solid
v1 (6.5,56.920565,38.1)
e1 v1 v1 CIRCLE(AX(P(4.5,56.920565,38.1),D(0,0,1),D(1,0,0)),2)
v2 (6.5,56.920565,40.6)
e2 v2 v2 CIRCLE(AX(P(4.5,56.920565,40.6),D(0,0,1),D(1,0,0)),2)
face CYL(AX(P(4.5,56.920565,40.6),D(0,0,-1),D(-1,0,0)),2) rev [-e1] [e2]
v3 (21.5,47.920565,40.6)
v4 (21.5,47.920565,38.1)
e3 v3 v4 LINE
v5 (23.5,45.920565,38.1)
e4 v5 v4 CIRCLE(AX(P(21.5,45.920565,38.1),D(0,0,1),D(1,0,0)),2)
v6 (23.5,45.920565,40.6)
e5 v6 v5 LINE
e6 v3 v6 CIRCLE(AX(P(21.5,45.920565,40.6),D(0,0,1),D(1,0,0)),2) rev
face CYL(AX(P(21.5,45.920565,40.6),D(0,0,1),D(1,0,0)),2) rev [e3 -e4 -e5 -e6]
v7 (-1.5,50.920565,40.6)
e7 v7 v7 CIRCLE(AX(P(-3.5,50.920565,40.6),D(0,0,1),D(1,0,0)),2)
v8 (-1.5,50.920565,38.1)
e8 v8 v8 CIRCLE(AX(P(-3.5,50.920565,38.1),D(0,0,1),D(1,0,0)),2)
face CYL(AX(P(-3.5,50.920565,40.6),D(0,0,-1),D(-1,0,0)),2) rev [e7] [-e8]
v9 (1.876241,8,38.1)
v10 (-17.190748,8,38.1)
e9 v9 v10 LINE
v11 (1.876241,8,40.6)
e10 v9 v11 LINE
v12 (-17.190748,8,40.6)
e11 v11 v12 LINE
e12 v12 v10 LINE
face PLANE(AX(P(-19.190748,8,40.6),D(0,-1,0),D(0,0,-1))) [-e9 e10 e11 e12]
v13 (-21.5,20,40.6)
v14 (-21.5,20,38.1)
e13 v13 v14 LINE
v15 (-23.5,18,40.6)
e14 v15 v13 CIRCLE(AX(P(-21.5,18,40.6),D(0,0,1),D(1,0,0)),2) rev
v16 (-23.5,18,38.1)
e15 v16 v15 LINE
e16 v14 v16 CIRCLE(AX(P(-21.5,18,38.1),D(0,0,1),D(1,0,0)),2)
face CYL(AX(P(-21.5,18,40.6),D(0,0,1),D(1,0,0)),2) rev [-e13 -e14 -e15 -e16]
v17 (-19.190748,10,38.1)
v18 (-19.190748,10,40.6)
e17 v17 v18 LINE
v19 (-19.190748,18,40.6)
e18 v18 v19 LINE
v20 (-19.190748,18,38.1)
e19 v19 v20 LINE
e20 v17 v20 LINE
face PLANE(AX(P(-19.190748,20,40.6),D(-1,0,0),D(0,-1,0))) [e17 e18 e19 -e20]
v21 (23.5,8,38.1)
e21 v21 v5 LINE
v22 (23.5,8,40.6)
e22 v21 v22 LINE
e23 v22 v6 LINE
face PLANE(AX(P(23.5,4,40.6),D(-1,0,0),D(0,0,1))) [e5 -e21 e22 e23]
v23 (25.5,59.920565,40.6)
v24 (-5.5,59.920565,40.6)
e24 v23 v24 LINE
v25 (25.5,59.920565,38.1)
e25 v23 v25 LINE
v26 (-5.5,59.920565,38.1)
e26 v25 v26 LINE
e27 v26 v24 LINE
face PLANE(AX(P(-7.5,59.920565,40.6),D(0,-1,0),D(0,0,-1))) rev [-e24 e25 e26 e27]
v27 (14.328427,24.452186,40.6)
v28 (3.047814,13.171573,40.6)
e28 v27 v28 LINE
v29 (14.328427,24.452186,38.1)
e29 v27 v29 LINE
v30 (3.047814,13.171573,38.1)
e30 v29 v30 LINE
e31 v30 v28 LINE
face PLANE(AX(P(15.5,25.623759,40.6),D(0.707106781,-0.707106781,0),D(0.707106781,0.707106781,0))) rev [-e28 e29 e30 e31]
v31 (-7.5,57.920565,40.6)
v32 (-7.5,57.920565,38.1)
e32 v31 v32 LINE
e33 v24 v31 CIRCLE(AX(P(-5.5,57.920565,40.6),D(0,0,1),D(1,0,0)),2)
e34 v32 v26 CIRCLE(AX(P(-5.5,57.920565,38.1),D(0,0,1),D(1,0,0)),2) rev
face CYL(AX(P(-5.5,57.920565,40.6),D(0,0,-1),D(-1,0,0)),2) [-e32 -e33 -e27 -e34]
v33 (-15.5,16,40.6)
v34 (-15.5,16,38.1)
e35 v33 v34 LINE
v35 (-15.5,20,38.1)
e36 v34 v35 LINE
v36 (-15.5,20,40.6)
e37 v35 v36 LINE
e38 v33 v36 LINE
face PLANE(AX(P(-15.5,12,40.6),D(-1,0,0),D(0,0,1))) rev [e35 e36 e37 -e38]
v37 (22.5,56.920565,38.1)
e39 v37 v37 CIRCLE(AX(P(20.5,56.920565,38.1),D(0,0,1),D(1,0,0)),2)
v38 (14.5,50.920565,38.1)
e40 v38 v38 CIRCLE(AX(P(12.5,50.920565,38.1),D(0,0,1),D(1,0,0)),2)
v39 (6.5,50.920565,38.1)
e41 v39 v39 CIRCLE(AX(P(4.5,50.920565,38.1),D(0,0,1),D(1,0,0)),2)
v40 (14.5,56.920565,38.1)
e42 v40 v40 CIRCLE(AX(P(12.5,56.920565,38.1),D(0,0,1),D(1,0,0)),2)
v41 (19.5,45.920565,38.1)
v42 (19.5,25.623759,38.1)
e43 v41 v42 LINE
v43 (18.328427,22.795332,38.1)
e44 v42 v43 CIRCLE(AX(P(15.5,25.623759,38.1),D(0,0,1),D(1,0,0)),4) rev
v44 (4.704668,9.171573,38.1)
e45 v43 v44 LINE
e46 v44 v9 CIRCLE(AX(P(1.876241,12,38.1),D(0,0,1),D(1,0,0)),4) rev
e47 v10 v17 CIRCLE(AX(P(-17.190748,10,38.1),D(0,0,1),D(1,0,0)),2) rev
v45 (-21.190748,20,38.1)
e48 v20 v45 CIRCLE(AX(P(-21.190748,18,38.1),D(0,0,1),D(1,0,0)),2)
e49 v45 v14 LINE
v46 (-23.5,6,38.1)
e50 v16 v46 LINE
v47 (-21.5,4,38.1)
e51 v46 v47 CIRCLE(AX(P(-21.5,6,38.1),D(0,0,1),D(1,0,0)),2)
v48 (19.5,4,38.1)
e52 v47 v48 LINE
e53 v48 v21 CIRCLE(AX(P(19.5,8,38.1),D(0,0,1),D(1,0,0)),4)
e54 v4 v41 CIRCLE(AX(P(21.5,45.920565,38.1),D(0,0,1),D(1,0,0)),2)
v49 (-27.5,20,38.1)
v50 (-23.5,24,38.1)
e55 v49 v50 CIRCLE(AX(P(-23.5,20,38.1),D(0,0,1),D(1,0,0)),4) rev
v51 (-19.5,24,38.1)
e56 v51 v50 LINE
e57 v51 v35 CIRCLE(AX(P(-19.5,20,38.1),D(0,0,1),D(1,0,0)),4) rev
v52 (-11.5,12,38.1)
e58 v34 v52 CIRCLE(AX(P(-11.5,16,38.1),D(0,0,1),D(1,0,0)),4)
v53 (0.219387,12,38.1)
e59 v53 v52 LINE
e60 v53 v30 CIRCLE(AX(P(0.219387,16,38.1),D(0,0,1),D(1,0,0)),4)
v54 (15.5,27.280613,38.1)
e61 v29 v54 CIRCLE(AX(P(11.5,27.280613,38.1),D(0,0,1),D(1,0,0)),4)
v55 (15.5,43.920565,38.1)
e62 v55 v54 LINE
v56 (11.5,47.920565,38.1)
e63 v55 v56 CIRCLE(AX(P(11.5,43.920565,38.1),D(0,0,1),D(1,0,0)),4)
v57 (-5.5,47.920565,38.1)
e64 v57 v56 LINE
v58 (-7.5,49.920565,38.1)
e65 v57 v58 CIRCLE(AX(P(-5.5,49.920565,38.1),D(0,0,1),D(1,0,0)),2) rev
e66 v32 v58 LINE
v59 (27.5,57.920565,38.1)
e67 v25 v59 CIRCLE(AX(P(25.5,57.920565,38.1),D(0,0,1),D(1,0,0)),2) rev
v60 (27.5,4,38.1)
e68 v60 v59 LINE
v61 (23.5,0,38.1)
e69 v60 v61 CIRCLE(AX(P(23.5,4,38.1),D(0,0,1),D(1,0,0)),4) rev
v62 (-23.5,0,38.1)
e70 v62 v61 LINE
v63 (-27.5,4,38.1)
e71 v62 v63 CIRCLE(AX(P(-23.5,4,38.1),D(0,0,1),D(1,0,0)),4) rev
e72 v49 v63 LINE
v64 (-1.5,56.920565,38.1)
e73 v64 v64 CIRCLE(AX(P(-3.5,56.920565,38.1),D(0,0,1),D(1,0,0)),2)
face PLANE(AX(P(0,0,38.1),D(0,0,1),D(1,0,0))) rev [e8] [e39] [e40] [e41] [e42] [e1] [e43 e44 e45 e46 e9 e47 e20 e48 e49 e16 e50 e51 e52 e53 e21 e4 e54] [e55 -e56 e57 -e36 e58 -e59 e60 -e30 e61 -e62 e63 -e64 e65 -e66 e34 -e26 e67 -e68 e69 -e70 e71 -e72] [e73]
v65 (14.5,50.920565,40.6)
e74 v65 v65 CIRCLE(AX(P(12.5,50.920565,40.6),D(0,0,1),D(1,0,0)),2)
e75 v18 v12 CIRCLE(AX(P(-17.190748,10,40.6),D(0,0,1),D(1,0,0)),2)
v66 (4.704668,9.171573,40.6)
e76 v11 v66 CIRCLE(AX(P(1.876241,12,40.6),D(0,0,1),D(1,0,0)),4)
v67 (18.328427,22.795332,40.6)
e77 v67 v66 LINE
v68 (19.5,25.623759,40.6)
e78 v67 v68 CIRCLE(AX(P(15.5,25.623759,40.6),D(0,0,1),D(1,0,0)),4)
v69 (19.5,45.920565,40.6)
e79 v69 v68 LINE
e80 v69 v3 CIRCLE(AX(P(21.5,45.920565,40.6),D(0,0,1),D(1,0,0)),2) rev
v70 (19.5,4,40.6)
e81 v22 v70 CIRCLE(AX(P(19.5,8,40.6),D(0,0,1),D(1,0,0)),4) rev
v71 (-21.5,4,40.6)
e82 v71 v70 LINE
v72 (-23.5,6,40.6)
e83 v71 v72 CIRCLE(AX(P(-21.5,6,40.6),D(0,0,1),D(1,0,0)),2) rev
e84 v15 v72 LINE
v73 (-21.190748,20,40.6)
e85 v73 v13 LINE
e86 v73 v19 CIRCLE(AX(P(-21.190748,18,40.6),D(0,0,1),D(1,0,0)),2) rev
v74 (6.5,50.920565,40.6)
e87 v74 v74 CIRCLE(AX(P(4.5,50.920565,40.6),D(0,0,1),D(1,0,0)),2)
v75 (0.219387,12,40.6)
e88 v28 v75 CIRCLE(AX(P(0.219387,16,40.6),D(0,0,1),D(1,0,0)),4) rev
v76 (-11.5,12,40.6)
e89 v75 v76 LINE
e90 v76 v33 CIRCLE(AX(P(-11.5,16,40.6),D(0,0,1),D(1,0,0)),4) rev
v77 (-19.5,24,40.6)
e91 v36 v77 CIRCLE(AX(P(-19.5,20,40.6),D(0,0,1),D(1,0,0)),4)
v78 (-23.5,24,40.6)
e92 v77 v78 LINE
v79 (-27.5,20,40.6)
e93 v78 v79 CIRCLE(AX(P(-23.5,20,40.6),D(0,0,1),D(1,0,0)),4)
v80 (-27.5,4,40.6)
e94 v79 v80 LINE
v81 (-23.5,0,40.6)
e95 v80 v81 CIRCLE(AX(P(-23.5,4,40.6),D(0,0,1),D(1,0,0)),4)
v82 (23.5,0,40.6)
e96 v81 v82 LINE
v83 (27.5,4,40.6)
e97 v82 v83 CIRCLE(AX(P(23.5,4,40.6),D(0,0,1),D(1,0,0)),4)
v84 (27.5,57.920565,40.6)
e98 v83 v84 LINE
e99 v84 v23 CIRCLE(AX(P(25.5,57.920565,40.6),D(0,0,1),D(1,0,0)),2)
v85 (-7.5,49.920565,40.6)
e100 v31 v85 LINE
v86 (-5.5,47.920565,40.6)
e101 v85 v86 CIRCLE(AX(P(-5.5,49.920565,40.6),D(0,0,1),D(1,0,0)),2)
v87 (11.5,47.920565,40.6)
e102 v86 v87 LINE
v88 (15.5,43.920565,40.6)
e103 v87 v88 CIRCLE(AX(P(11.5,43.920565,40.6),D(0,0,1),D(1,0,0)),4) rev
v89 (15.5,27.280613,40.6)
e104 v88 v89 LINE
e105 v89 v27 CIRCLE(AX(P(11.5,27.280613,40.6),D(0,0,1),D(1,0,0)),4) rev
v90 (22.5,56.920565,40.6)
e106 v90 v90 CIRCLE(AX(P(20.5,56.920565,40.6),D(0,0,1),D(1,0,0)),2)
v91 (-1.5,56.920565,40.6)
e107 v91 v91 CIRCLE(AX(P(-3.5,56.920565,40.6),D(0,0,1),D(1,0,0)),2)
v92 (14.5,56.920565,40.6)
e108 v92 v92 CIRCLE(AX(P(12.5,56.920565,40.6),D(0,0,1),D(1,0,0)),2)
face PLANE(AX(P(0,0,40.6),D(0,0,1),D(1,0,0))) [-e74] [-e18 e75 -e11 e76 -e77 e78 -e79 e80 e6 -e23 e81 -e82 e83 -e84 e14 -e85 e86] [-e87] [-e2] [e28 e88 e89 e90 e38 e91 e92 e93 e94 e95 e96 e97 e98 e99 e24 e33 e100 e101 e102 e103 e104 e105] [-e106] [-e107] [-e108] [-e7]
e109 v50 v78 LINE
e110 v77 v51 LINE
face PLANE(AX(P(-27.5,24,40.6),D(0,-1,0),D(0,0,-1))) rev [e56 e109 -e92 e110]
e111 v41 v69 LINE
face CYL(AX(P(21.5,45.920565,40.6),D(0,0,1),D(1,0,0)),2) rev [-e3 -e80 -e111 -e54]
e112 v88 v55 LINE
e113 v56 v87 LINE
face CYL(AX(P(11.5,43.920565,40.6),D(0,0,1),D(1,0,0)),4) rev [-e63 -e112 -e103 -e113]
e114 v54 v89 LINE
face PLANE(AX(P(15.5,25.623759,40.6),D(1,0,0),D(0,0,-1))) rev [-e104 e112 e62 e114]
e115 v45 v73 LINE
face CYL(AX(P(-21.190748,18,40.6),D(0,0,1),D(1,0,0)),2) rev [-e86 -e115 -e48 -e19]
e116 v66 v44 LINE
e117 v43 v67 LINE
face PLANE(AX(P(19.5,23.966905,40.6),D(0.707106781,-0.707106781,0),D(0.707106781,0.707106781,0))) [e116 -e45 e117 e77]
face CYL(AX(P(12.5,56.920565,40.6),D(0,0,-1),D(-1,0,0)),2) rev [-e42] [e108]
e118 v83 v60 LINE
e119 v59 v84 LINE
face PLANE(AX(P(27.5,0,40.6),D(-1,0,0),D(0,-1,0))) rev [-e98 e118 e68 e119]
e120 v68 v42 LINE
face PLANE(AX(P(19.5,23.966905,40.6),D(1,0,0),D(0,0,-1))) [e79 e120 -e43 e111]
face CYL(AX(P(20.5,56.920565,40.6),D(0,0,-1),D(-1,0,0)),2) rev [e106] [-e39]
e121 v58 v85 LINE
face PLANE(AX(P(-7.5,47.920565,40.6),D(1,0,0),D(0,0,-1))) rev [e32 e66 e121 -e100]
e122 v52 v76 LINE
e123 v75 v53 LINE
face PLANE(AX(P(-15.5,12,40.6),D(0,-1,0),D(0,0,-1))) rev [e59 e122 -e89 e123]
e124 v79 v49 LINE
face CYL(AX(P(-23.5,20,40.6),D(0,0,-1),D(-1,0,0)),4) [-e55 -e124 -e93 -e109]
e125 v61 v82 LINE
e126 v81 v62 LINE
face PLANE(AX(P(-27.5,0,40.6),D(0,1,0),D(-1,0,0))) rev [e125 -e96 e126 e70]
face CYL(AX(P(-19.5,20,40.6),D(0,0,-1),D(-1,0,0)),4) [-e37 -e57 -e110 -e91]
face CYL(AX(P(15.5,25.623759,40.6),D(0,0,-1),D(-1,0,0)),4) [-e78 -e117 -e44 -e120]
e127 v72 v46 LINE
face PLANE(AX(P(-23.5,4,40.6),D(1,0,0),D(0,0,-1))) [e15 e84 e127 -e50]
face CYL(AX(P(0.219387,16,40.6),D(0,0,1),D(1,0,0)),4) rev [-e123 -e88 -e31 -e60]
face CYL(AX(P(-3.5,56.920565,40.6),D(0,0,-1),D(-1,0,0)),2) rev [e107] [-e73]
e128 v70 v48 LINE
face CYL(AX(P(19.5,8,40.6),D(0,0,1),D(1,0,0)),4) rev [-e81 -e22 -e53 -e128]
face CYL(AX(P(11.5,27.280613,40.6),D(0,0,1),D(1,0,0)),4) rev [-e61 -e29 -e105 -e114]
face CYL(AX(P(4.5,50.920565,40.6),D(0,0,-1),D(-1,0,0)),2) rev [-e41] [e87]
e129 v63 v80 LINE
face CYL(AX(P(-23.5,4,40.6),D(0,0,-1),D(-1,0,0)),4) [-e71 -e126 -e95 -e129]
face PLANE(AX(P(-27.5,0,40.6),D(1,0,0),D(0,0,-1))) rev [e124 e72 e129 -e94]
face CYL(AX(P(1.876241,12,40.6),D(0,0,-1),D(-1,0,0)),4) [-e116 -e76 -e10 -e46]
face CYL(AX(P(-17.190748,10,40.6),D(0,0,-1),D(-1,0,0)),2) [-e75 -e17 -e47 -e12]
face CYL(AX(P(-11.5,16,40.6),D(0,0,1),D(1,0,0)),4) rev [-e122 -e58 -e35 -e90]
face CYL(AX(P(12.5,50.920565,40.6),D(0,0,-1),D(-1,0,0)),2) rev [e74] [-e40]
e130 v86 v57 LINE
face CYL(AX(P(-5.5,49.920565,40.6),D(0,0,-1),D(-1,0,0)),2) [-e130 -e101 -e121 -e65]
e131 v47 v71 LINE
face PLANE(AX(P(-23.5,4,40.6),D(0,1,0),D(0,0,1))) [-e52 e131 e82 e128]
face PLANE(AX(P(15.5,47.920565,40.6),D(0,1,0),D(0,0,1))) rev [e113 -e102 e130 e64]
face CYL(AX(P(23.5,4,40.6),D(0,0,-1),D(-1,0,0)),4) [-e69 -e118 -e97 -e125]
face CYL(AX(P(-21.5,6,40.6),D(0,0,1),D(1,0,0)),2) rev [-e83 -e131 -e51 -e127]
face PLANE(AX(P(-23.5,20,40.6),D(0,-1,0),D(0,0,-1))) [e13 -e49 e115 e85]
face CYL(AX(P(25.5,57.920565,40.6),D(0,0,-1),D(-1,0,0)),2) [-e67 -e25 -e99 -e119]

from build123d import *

# Parameters (mm, degrees)
SKETCH2_R           = 2
BOSS_EXTRUDE1_DEPTH = 2.5
FILLET1_R           = 4
FILLET2_R           = 2


with BuildPart() as part:
    # Sketch2 → Boss-Extrude1 (new body)
    with BuildSketch(Plane.XY.offset(38.1)):
        Polygon((-27.5, 0), (27.5, 0), (27.5, 59.920564885), (-7.5, 59.920564885), (-7.5, 47.920564885), (15.5, 47.920564885), (15.5, 25.623759218), (1.876240782, 12), (-15.5, 12), (-15.5, 24), (-27.5, 24), (-27.5, 12), align=None)
        with Locations((-3.5, 56.920564885)):
            Circle(SKETCH2_R, mode=Mode.SUBTRACT)
        with Locations((-3.5, 50.920564885)):
            Circle(SKETCH2_R, mode=Mode.SUBTRACT)
        with Locations((4.5, 50.920564885)):
            Circle(SKETCH2_R, mode=Mode.SUBTRACT)
        with Locations((12.5, 50.920564885)):
            Circle(SKETCH2_R, mode=Mode.SUBTRACT)
        with Locations((4.5, 56.920564885)):
            Circle(SKETCH2_R, mode=Mode.SUBTRACT)
        with Locations((12.5, 56.920564885)):
            Circle(SKETCH2_R, mode=Mode.SUBTRACT)
        with Locations((20.5, 56.920564885)):
            Circle(SKETCH2_R, mode=Mode.SUBTRACT)
        Polygon((23.5, 4), (23.5, 47.920564885), (19.5, 47.920564885), (19.5, 23.966904969), (3.533095031, 8), (-19.190748402, 8), (-19.190748402, 20), (-23.5, 20), (-23.5, 8), (-23.5, 4), align=None, mode=Mode.SUBTRACT)
    extrude(amount=BOSS_EXTRUDE1_DEPTH)

    # Fillet1
    fillet1_edges = [part.edges().sort_by_distance(p)[0] for p in [
        (15.5, 25.623759218, 39.35),
        (15.5, 47.920564885, 39.35),
        (27.5, 0, 39.35),
        (-27.5, 0, 39.35),
        (-27.5, 24, 39.35),
        (-15.5, 24, 39.35),
        (-15.5, 12, 39.35),
        (1.876240782, 12, 39.35),
        (23.5, 4, 39.35),
        (19.5, 23.966904969, 39.35),
        (3.533095031, 8, 39.35),
    ]]
    fillet(fillet1_edges, radius=FILLET1_R)

    # Fillet2
    fillet2_edges = [part.edges().sort_by_distance(p)[0] for p in [
        (-7.5, 47.920564885, 39.35),
        (-7.5, 59.920564885, 39.35),
        (27.5, 59.920564885, 39.35),
        (-23.5, 4, 39.35),
        (23.5, 47.920564885, 39.35),
        (19.5, 47.920564885, 39.35),
        (-19.190748402, 8, 39.35),
        (-19.190748402, 20, 39.35),
        (-23.5, 20, 39.35),
    ]]
    fillet(fillet2_edges, radius=FILLET2_R - 0.0001)  # a hair under: the kernel refuses the full size


solid = part.part
